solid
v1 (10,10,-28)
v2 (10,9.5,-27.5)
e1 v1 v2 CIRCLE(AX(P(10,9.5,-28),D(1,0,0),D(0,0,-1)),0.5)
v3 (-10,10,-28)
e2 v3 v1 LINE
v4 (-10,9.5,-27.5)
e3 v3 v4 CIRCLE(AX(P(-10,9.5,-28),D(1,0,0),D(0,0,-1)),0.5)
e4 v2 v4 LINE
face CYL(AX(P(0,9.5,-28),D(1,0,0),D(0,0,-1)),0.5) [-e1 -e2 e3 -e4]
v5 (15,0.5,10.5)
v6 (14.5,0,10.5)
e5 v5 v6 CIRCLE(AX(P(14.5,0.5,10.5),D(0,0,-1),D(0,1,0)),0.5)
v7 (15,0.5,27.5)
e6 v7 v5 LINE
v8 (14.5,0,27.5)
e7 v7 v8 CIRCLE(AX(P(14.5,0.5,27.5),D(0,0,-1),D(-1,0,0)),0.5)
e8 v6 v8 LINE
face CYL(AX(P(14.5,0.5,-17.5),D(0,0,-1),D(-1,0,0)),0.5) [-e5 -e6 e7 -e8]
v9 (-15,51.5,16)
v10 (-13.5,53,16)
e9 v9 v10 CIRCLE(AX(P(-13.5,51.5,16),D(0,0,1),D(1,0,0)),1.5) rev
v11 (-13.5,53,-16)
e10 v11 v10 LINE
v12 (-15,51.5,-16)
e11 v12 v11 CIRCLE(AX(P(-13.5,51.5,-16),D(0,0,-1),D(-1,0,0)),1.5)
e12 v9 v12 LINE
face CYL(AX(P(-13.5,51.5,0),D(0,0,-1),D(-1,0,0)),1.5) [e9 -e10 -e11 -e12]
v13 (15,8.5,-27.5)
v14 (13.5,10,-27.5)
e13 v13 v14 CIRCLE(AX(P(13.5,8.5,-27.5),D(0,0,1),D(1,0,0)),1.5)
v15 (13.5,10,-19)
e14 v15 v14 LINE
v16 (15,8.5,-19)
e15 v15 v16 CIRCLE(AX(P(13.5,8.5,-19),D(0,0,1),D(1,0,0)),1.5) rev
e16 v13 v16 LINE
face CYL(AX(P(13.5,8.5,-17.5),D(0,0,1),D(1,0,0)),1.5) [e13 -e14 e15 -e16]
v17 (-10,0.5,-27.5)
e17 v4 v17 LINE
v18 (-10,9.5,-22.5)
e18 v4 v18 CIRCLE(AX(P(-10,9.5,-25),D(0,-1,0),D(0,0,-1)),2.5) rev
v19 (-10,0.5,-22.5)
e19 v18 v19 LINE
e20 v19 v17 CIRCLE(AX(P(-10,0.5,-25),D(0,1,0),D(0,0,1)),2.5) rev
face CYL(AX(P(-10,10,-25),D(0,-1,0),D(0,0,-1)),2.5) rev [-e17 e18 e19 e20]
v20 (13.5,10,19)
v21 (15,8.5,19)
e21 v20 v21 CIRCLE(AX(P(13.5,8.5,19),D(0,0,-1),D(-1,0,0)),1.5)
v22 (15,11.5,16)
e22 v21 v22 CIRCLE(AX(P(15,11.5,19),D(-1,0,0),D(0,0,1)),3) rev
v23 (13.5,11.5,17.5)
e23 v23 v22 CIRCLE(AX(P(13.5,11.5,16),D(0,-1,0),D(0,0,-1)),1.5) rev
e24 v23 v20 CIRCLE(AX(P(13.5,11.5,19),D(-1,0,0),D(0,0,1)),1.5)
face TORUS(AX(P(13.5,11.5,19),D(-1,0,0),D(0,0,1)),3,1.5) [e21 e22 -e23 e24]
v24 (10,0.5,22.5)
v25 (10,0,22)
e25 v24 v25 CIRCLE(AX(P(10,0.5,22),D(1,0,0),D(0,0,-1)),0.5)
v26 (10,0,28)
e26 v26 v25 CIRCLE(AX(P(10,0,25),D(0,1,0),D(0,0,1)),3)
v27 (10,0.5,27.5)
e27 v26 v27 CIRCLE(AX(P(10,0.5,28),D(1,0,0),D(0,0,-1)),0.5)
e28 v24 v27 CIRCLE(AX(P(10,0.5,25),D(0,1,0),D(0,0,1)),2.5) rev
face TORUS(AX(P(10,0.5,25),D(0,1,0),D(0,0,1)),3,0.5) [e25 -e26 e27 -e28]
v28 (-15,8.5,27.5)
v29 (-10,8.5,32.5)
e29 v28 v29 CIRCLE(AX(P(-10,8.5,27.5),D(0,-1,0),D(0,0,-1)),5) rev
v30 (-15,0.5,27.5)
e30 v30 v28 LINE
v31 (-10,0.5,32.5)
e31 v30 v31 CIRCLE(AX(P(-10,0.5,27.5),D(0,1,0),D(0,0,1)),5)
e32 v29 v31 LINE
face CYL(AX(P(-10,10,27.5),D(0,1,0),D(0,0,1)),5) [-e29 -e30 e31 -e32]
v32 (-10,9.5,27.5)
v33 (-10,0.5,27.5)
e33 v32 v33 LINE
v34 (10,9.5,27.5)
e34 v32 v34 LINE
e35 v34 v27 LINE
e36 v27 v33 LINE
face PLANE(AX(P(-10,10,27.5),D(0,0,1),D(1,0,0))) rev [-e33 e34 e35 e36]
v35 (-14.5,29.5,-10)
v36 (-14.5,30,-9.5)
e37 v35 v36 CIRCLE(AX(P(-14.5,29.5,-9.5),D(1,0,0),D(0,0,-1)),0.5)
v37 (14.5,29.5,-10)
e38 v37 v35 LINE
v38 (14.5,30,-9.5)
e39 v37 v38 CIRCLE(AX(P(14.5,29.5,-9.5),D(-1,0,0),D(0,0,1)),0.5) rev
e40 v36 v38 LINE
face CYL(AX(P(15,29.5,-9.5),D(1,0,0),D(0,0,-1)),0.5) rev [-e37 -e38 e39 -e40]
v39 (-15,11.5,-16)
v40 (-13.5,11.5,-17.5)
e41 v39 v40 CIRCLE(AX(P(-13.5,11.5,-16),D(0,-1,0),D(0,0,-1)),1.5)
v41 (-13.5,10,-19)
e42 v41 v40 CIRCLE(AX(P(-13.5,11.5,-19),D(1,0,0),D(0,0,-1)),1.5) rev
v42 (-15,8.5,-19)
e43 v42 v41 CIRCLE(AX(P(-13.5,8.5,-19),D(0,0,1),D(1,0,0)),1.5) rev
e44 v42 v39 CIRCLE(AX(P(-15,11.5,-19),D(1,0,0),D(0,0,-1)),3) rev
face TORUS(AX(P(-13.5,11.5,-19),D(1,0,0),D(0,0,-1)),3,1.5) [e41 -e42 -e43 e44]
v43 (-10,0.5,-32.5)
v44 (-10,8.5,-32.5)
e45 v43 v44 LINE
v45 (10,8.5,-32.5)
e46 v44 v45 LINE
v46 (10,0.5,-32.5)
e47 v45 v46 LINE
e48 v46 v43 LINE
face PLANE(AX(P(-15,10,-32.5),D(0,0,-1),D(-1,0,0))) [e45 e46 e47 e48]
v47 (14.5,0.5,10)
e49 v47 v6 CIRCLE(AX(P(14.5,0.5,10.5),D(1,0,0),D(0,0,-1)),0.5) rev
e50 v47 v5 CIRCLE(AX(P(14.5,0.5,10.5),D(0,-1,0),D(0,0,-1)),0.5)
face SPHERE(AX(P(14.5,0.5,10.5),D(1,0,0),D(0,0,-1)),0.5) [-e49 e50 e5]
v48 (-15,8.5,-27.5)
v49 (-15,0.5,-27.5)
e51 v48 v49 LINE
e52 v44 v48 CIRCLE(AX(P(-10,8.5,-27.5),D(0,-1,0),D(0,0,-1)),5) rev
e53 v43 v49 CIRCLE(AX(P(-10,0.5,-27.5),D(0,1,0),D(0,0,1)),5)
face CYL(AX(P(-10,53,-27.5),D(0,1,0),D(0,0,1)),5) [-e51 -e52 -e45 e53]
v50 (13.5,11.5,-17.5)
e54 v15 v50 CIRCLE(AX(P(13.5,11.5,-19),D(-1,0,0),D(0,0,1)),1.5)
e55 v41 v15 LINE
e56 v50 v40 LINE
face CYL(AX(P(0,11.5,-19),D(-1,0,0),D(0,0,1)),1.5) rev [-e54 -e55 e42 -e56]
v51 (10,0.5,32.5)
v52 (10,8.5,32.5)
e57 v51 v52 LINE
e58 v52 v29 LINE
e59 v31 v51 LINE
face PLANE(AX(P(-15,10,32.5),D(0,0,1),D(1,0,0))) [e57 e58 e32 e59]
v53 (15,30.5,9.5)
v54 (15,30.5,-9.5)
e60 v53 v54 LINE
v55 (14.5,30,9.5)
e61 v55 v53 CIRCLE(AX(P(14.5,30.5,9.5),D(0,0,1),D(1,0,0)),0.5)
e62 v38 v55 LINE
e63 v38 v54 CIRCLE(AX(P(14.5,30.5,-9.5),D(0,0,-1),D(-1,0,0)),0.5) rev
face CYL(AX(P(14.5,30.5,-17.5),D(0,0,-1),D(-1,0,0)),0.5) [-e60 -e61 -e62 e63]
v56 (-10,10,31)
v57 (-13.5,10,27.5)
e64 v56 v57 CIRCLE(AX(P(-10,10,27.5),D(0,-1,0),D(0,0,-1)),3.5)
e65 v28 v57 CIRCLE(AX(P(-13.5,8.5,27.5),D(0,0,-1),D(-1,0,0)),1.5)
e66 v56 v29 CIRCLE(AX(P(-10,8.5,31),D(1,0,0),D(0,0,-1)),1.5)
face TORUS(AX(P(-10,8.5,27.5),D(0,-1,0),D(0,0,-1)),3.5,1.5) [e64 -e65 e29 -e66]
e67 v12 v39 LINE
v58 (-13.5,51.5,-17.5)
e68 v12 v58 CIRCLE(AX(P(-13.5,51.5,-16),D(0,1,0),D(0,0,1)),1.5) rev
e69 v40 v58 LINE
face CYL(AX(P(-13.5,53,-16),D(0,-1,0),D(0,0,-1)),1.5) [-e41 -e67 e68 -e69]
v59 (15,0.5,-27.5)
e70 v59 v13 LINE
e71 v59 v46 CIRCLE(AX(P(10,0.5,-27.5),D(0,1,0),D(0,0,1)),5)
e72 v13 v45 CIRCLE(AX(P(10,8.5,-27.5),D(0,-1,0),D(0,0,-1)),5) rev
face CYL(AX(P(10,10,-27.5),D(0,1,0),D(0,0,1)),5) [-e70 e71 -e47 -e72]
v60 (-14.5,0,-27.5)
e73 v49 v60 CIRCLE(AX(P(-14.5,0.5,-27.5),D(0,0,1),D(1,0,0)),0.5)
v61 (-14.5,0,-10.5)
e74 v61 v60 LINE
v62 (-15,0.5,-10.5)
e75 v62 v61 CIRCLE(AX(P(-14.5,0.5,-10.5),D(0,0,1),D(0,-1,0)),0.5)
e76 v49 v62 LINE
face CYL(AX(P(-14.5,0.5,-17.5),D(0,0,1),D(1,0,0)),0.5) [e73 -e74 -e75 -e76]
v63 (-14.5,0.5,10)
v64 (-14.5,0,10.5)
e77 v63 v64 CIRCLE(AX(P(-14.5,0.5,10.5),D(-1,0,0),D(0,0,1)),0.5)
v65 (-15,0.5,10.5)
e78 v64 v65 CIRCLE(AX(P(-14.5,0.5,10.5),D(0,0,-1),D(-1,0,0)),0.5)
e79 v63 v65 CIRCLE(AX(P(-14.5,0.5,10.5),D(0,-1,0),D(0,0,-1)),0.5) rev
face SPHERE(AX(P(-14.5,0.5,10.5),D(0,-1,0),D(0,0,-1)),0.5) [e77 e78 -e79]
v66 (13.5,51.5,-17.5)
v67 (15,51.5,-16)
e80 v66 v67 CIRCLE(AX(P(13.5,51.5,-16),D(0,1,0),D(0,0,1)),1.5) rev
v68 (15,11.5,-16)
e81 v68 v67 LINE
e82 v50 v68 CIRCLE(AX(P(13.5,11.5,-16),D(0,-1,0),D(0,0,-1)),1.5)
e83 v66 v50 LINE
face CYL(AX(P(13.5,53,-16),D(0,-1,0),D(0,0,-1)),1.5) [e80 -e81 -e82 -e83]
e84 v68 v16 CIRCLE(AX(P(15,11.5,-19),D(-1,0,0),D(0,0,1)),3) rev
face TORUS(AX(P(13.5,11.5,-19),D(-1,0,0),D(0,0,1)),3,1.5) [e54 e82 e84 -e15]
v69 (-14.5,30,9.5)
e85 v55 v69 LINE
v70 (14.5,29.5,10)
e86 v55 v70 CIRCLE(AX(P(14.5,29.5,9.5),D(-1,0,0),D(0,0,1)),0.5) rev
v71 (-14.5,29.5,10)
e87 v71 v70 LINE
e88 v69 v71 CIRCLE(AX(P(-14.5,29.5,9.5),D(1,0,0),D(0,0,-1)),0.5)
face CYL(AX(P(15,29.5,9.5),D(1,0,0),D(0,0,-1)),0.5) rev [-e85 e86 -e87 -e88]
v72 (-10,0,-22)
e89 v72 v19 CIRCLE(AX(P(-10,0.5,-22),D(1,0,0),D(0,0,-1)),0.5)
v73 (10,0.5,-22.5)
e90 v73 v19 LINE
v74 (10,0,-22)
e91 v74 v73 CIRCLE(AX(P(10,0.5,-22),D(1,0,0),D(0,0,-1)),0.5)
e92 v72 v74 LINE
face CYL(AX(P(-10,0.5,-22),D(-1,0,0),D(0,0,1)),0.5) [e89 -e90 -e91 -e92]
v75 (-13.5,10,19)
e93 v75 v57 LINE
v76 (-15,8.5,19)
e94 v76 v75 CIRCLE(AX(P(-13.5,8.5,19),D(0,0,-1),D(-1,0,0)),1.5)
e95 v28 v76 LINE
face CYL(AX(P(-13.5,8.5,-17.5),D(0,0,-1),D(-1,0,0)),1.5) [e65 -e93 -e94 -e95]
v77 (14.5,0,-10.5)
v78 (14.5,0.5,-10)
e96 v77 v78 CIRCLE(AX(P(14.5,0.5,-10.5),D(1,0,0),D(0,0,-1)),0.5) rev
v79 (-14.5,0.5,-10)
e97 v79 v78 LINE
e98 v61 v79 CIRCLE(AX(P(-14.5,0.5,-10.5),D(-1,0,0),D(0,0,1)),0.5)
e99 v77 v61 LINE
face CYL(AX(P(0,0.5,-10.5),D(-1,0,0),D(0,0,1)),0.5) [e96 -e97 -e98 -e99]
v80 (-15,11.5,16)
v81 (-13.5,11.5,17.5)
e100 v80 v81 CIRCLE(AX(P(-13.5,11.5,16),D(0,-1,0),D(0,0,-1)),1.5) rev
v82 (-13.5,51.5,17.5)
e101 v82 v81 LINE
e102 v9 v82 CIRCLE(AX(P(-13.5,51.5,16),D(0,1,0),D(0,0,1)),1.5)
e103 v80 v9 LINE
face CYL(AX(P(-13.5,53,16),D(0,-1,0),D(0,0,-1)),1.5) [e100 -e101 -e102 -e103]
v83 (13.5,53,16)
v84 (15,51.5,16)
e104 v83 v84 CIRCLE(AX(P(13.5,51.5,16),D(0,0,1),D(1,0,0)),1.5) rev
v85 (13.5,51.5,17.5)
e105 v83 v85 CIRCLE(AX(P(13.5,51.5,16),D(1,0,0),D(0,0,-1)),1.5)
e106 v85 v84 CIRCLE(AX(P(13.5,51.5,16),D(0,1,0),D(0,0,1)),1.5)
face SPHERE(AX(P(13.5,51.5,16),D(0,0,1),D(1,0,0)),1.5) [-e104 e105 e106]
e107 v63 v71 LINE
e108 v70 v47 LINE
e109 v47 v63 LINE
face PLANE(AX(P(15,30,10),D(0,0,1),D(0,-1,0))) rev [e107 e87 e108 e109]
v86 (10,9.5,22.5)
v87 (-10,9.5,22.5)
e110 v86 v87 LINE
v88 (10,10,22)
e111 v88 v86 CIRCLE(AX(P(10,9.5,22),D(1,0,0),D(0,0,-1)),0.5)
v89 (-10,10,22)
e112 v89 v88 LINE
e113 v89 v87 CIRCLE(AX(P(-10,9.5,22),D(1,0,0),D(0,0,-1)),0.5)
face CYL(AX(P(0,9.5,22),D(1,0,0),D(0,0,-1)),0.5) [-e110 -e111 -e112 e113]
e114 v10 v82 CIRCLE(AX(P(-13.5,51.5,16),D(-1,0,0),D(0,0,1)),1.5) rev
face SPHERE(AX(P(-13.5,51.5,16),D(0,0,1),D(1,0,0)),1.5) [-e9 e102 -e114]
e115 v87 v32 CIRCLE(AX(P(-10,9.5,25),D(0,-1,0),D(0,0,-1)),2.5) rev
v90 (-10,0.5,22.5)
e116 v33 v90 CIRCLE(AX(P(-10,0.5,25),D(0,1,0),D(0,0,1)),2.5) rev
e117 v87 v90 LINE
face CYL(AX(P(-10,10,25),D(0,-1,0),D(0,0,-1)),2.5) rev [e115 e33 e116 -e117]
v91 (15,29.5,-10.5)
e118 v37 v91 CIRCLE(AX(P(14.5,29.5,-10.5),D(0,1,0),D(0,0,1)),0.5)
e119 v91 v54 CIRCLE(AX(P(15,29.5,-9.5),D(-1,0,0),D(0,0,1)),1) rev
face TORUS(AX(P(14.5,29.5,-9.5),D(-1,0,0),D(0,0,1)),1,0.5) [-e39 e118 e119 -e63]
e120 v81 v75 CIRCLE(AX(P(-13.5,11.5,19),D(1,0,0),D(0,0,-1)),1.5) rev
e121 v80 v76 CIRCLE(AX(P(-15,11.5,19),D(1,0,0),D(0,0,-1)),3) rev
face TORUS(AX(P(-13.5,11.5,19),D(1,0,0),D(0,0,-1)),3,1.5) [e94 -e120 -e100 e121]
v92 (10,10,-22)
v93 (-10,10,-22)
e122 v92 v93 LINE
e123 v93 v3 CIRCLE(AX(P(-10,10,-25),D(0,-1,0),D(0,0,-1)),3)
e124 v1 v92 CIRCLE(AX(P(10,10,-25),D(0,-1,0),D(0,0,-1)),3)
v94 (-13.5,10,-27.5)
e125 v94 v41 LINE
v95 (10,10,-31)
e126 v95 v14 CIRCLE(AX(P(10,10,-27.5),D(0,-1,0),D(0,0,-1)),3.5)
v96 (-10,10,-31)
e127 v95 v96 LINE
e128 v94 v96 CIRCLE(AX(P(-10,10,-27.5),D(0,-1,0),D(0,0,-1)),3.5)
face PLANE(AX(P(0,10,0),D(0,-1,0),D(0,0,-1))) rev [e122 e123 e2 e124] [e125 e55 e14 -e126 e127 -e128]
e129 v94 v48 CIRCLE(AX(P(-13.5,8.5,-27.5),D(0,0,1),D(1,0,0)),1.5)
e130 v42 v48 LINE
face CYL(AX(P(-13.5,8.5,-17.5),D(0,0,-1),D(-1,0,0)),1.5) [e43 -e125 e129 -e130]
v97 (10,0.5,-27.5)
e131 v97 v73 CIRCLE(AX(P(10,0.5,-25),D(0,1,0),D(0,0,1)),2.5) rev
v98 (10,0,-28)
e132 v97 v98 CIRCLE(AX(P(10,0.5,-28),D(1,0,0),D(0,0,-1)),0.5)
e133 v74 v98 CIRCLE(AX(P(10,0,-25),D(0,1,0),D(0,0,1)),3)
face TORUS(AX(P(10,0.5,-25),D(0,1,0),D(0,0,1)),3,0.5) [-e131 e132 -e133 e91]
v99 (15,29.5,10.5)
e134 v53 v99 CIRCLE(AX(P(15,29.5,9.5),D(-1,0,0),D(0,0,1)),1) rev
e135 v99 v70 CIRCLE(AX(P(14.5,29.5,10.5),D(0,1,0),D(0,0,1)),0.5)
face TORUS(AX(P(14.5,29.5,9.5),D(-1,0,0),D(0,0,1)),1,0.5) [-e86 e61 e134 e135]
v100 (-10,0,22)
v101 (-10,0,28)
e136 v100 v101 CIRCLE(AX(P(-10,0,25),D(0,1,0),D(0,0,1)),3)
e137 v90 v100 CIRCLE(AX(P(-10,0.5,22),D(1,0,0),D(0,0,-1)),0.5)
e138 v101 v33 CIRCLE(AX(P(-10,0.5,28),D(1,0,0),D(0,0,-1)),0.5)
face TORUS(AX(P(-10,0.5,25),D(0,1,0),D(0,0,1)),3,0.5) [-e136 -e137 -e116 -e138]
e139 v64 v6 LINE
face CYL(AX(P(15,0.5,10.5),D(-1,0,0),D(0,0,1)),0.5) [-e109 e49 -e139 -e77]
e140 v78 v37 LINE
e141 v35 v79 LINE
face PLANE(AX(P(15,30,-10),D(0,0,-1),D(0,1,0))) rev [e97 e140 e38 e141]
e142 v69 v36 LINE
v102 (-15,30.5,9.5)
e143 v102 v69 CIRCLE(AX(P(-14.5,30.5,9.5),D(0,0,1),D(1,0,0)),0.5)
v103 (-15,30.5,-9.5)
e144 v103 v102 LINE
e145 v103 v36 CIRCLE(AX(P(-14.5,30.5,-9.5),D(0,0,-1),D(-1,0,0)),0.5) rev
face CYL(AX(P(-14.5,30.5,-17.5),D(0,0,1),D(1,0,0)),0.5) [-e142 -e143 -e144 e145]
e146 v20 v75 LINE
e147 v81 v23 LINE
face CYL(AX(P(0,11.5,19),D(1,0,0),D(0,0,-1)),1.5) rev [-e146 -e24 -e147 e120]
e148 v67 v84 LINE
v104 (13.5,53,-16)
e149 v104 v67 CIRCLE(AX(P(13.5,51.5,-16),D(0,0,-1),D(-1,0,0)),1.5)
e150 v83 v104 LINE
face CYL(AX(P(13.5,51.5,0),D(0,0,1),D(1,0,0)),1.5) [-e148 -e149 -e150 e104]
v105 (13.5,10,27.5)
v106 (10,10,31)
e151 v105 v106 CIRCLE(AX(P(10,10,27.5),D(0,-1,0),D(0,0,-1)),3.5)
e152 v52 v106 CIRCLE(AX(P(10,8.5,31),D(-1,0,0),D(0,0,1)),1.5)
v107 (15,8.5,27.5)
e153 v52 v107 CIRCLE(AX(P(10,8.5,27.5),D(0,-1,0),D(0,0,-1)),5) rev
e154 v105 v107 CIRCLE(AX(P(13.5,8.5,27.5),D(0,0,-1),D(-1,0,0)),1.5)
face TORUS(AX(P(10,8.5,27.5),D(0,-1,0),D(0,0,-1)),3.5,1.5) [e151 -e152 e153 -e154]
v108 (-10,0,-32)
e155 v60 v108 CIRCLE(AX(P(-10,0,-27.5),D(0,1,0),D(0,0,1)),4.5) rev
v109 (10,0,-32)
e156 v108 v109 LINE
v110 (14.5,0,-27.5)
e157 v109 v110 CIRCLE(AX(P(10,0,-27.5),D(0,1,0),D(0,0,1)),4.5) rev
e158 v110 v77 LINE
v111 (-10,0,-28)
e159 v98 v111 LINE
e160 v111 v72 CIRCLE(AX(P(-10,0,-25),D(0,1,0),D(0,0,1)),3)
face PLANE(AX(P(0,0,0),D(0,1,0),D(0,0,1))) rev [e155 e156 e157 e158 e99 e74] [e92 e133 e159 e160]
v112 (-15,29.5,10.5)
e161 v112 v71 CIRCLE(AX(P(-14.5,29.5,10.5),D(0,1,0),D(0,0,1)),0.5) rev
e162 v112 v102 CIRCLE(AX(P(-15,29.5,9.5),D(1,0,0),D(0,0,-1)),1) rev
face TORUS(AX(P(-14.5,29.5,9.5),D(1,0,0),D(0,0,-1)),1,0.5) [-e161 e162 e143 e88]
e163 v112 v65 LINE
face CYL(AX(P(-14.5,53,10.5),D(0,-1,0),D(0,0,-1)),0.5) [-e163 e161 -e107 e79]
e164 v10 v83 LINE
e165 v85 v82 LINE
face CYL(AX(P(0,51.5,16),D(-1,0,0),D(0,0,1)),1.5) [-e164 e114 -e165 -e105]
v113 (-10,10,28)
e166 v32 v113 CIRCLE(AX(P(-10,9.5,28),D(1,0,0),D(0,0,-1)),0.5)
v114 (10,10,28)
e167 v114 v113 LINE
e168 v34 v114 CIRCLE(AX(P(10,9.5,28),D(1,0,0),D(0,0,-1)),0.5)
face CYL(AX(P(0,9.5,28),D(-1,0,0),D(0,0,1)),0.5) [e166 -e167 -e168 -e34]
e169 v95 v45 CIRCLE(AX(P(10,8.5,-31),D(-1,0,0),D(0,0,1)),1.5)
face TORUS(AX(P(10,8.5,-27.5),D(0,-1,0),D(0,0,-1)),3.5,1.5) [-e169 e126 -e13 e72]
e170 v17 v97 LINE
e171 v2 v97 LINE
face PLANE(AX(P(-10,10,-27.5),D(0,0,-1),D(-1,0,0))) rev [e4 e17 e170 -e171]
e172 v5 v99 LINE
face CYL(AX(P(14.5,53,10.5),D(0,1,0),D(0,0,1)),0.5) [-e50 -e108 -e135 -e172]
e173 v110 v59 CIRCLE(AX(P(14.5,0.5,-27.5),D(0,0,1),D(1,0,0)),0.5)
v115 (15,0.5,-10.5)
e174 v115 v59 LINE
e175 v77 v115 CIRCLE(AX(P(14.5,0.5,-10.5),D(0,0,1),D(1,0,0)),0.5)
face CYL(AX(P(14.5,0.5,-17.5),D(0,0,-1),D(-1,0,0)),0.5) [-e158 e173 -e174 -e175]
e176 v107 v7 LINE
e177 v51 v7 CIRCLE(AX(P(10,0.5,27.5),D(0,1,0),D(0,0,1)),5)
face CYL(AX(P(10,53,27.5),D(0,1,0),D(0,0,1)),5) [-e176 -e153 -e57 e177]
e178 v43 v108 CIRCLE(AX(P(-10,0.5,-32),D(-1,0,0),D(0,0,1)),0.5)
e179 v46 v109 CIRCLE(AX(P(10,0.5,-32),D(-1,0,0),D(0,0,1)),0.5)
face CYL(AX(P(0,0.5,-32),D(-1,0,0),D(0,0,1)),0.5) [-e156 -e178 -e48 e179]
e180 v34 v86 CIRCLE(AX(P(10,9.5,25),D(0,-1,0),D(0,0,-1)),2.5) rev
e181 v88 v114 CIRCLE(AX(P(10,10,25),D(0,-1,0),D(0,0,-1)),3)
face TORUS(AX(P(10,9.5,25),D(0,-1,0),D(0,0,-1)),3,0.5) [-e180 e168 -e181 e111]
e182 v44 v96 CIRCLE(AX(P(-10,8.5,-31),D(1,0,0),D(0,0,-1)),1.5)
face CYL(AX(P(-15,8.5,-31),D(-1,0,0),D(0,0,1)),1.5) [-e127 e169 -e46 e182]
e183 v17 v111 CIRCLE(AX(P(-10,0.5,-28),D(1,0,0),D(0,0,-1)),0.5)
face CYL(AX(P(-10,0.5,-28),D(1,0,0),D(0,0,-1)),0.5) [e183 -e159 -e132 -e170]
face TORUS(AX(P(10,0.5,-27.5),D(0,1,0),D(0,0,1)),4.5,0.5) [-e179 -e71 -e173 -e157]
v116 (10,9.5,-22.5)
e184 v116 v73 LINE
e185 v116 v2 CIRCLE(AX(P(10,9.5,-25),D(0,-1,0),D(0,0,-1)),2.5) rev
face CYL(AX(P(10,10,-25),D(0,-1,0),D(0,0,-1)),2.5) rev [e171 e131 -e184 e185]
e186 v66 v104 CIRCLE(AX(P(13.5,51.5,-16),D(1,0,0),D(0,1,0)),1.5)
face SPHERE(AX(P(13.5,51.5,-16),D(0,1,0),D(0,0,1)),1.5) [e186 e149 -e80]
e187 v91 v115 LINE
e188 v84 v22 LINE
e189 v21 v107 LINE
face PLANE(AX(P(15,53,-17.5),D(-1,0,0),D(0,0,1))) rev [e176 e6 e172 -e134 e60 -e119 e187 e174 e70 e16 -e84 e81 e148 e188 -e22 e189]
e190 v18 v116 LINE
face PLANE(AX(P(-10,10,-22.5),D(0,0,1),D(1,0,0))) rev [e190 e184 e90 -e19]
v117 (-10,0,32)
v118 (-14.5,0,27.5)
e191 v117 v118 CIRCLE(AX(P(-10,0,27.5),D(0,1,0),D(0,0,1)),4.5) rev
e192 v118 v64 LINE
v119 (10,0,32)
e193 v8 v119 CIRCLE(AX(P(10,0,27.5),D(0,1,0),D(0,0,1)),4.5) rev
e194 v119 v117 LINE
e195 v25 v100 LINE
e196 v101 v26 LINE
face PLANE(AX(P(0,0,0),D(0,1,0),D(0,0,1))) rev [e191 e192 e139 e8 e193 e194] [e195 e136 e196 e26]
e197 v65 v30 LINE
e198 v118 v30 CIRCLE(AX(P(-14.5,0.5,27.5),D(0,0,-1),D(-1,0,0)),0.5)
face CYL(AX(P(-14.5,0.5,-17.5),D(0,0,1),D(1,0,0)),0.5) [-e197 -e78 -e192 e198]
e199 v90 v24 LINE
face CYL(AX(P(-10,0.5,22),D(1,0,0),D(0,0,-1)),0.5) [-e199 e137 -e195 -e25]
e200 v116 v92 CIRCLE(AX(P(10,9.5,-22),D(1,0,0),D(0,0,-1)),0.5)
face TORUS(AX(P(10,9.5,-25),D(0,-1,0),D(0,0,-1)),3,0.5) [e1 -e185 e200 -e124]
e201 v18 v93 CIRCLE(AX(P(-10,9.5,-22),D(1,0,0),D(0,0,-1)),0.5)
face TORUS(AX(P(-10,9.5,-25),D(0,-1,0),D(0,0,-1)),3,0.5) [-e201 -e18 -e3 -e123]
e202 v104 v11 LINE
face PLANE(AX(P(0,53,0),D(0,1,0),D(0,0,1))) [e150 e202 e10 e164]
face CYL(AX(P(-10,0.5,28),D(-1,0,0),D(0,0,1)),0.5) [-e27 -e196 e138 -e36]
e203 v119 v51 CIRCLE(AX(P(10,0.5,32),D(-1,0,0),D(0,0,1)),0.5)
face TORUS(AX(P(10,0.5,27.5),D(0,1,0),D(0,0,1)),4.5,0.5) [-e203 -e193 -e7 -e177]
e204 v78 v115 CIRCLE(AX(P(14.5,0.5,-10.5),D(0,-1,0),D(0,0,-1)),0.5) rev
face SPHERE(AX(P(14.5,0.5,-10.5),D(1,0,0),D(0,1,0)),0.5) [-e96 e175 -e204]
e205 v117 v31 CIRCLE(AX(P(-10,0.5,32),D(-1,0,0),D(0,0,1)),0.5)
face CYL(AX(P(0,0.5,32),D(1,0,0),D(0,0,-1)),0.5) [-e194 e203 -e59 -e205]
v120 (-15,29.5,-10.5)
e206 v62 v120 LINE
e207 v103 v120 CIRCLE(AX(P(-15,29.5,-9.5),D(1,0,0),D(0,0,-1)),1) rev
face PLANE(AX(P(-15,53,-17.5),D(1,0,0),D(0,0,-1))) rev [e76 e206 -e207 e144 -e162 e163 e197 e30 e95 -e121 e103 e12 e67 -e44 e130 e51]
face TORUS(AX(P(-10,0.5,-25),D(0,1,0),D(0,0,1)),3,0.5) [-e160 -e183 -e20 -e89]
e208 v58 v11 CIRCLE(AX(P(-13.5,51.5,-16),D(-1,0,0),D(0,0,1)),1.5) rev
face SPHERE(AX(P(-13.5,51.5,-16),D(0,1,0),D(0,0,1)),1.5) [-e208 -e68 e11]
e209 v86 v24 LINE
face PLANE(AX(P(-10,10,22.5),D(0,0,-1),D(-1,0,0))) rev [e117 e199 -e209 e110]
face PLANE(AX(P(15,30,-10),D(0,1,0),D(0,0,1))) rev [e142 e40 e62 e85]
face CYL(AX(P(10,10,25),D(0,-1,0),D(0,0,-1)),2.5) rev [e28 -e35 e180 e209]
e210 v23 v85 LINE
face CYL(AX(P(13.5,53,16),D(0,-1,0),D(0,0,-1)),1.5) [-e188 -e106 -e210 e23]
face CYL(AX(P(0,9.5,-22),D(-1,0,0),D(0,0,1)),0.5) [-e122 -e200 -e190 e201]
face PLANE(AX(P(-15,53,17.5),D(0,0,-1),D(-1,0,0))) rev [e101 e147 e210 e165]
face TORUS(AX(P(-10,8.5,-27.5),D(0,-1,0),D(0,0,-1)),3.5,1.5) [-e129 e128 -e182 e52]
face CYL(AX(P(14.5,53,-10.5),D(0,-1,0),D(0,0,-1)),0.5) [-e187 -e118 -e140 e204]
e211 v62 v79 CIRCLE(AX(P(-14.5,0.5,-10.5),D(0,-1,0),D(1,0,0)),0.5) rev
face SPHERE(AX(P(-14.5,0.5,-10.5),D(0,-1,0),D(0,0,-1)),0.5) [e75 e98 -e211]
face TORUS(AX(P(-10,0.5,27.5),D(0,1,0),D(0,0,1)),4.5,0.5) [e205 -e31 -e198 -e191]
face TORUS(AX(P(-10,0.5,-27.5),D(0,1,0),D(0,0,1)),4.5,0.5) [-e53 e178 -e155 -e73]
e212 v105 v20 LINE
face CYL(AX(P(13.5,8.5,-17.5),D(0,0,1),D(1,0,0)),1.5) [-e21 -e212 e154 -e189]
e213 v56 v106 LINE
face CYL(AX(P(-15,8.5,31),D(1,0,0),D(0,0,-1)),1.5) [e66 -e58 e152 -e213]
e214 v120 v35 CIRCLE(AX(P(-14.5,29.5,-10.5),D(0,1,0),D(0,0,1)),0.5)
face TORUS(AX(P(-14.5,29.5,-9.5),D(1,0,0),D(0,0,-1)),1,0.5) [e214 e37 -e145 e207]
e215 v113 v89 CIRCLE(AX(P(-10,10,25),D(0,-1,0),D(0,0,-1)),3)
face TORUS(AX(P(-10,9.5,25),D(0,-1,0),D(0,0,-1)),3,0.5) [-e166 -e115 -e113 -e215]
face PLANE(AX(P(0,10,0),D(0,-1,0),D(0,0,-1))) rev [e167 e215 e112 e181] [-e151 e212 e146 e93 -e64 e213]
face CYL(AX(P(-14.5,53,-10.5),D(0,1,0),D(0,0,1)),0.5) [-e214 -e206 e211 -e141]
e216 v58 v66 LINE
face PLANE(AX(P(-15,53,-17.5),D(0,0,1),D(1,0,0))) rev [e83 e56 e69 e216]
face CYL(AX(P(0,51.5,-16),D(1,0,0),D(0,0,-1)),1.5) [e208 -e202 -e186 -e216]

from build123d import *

# Parameters (mm, degrees)
SKETCH1_W               = 30
SKETCH1_H               = 35
BOSS_EXTRUDE1_DEPTH     = 53
SKETCH2_W               = 30
SKETCH2_H               = 65
BOSS_EXTRUDE2_DEPTH     = 10
CUT_EXTRUDE1_DEPTH      = 70.030790232
CUT_EXTRUDE1_DEPTH_BACK = 70.030790232
SKETCH3_W               = 20
SKETCH3_H               = 30
FILLET1_R               = 1.5
FILLET2_R               = 5
FILLET3_R               = 0.5


with BuildPart() as part:
    # Sketch1 → Boss-Extrude1 (new body)
    with BuildSketch(Plane(origin=(0, 0, 0), x_dir=(1, 0, 0), z_dir=(0, 1, 0))):
        Rectangle(SKETCH1_W, SKETCH1_H)
    extrude(amount=BOSS_EXTRUDE1_DEPTH)

    # Sketch2 → Boss-Extrude2 (add)
    with BuildSketch(Plane.XZ):
        Rectangle(SKETCH2_W, SKETCH2_H)
        with BuildLine():
            Line((-10, 27.5), (10, 27.5))
            ThreePointArc((10, 27.5), (12.5, 25), (10, 22.5))
            Line((10, 22.5), (-10, 22.5))
            ThreePointArc((-10, 22.5), (-12.5, 25), (-10, 27.5))
        make_face(mode=Mode.SUBTRACT)
        with BuildLine():
            Line((-10, -27.5), (10, -27.5))
            ThreePointArc((10, -27.5), (12.5, -25), (10, -22.5))
            Line((10, -22.5), (-10, -22.5))
            ThreePointArc((-10, -22.5), (-12.5, -25), (-10, -27.5))
        make_face(mode=Mode.SUBTRACT)
    extrude(amount=-BOSS_EXTRUDE2_DEPTH)

    # Sketch3 → Cut-Extrude1 (cut, two sides: drawn at the far end of the back side and taken through both)
    with BuildSketch(Plane.ZY.offset(15).offset(-CUT_EXTRUDE1_DEPTH_BACK)):
        with Locations((0, 15)):
            Rectangle(SKETCH3_W, SKETCH3_H)
    extrude(amount=CUT_EXTRUDE1_DEPTH + CUT_EXTRUDE1_DEPTH_BACK, mode=Mode.SUBTRACT)

    # Fillet1
    fillet1_edges = [part.edges().sort_by_distance(p)[0] for p in [
        (-15, 53, 0),
        (0, 10, 17.5),
        (0, 53, 17.5),
        (0, 10, -17.5),
        (15, 10, -25),
        (15, 10, 25),
        (-15, 10, -25),
        (-15, 10, 25),
        (0, 10, -32.5),
        (0, 10, 32.5),
        (15, 53, 0),
        (15, 31.5, 17.5),
        (-15, 31.5, 17.5),
        (-15, 31.5, -17.5),
        (15, 31.5, -17.5),
        (0, 53, -17.5),
    ]]
    fillet(fillet1_edges, radius=FILLET1_R)

    # Fillet2
    # the kernel refuses this fillet: 5 mm, written as the material it takes off along each edge
    with BuildSketch(Plane(origin=(-10, 10, 27.5), x_dir=(-1, 0, 0), z_dir=(0, 0, -1))) as fillet2_piece_1:
        with BuildLine():
            CenterArc((3.5, -1.5), 1.5, 0, 90)
            Line((5, -1.5), (5, 0))
            Line((5, 0), (3.5, 0))
        make_face()
    revolve(axis=Axis((-10, 10, 27.5), (0, 1, 0)), revolution_arc=90, mode=Mode.SUBTRACT)
    with BuildSketch(Plane(origin=(10, 10, 27.5), x_dir=(0, 0, 1), z_dir=(-1, 0, 0))) as fillet2_piece_2:
        with BuildLine():
            CenterArc((3.5, -1.5), 1.5, 0, 90)
            Line((5, -1.5), (5, 0))
            Line((5, 0), (3.5, 0))
        make_face()
    revolve(axis=Axis((10, 10, 27.5), (0, 1, 0)), revolution_arc=90, mode=Mode.SUBTRACT)
    with BuildSketch(Plane(origin=(-10, 10, -27.5), x_dir=(0, 0, -1), z_dir=(1, 0, 0))) as fillet2_piece_3:
        with BuildLine():
            CenterArc((3.5, -1.5), 1.5, 0, 90)
            Line((5, -1.5), (5, 0))
            Line((5, 0), (3.5, 0))
        make_face()
    revolve(axis=Axis((-10, 10, -27.5), (0, 1, 0)), revolution_arc=90, mode=Mode.SUBTRACT)
    with BuildSketch(Plane(origin=(10, 10, -27.5), x_dir=(1, 0, 0), z_dir=(0, 0, 1))) as fillet2_piece_4:
        with BuildLine():
            CenterArc((3.5, -1.5), 1.5, 0, 90)
            Line((5, -1.5), (5, 0))
            Line((5, 0), (3.5, 0))
        make_face()
    revolve(axis=Axis((10, 10, -27.5), (0, 1, 0)), revolution_arc=90, mode=Mode.SUBTRACT)
    with BuildSketch(Plane(origin=(15, -12.5, -32.5), x_dir=(0, 0, 1), z_dir=(0, 1, 0)), Plane(origin=(15, -12.5, 32.5), x_dir=(-1, 0, 0), z_dir=(0, 1, 0))) as fillet2_piece_5:
        with BuildLine():
            CenterArc((FILLET2_R, -FILLET2_R), FILLET2_R, 90, 90)
            Line((0, -FILLET2_R), (0, 0))
            Line((0, 0), (FILLET2_R, 0))
        make_face()
    extrude(amount=22.5, mode=Mode.SUBTRACT)
    with BuildSketch(Plane(origin=(-15, -12.5, 32.5), x_dir=(1, 0, 0), z_dir=(0, 1, 0)), Plane(origin=(-15, -12.5, -32.5), x_dir=(0, 0, 1), z_dir=(0, 1, 0))) as fillet2_piece_6:
        with BuildLine():
            CenterArc((FILLET2_R, FILLET2_R), FILLET2_R, 180, 90)
            Line((0, FILLET2_R), (0, 0))
            Line((0, 0), (FILLET2_R, 0))
        make_face()
    extrude(amount=22.5, mode=Mode.SUBTRACT)

    # Fillet3
    fillet3_edges = [part.edges().sort_by_distance(p)[0] for p in [
        (15, 0, 18.75),
        (0, 0, 32.5),
        (-13.535533906, 0, 31.035533906),
        (13.535533906, 0, 31.035533906),
        (-15, 0, -18.75),
        (0, 0, -32.5),
        (13.535533906, 0, -31.035533906),
        (-13.535533906, 0, -31.035533906),
        (0, 10, -22.5),
        (-12.5, 10, -25),
        (0, 10, -27.5),
        (12.5, 10, -25),
        (0, 10, 27.5),
        (-12.5, 10, 25),
        (0, 10, 22.5),
        (12.5, 10, 25),
        (-12.5, 0, 25),
        (0, 0, 27.5),
        (12.5, 0, 25),
        (0, 0, 22.5),
        (-12.5, 0, -25),
        (0, 0, -22.5),
        (12.5, 0, -25),
        (0, 0, -27.5),
        (15, 0, -18.75),
        (-15, 0, 18.75),
        (-15, 30, 0),
        (0, 0, 10),
        (0, 30, -10),
        (15, 30, 0),
        (0, 30, 10),
        (-15, 15, 10),
        (15, 15, 10),
        (0, 0, -10),
        (-15, 15, -10),
        (15, 15, -10),
    ]]
    fillet(fillet3_edges, radius=FILLET3_R)


solid = part.part
